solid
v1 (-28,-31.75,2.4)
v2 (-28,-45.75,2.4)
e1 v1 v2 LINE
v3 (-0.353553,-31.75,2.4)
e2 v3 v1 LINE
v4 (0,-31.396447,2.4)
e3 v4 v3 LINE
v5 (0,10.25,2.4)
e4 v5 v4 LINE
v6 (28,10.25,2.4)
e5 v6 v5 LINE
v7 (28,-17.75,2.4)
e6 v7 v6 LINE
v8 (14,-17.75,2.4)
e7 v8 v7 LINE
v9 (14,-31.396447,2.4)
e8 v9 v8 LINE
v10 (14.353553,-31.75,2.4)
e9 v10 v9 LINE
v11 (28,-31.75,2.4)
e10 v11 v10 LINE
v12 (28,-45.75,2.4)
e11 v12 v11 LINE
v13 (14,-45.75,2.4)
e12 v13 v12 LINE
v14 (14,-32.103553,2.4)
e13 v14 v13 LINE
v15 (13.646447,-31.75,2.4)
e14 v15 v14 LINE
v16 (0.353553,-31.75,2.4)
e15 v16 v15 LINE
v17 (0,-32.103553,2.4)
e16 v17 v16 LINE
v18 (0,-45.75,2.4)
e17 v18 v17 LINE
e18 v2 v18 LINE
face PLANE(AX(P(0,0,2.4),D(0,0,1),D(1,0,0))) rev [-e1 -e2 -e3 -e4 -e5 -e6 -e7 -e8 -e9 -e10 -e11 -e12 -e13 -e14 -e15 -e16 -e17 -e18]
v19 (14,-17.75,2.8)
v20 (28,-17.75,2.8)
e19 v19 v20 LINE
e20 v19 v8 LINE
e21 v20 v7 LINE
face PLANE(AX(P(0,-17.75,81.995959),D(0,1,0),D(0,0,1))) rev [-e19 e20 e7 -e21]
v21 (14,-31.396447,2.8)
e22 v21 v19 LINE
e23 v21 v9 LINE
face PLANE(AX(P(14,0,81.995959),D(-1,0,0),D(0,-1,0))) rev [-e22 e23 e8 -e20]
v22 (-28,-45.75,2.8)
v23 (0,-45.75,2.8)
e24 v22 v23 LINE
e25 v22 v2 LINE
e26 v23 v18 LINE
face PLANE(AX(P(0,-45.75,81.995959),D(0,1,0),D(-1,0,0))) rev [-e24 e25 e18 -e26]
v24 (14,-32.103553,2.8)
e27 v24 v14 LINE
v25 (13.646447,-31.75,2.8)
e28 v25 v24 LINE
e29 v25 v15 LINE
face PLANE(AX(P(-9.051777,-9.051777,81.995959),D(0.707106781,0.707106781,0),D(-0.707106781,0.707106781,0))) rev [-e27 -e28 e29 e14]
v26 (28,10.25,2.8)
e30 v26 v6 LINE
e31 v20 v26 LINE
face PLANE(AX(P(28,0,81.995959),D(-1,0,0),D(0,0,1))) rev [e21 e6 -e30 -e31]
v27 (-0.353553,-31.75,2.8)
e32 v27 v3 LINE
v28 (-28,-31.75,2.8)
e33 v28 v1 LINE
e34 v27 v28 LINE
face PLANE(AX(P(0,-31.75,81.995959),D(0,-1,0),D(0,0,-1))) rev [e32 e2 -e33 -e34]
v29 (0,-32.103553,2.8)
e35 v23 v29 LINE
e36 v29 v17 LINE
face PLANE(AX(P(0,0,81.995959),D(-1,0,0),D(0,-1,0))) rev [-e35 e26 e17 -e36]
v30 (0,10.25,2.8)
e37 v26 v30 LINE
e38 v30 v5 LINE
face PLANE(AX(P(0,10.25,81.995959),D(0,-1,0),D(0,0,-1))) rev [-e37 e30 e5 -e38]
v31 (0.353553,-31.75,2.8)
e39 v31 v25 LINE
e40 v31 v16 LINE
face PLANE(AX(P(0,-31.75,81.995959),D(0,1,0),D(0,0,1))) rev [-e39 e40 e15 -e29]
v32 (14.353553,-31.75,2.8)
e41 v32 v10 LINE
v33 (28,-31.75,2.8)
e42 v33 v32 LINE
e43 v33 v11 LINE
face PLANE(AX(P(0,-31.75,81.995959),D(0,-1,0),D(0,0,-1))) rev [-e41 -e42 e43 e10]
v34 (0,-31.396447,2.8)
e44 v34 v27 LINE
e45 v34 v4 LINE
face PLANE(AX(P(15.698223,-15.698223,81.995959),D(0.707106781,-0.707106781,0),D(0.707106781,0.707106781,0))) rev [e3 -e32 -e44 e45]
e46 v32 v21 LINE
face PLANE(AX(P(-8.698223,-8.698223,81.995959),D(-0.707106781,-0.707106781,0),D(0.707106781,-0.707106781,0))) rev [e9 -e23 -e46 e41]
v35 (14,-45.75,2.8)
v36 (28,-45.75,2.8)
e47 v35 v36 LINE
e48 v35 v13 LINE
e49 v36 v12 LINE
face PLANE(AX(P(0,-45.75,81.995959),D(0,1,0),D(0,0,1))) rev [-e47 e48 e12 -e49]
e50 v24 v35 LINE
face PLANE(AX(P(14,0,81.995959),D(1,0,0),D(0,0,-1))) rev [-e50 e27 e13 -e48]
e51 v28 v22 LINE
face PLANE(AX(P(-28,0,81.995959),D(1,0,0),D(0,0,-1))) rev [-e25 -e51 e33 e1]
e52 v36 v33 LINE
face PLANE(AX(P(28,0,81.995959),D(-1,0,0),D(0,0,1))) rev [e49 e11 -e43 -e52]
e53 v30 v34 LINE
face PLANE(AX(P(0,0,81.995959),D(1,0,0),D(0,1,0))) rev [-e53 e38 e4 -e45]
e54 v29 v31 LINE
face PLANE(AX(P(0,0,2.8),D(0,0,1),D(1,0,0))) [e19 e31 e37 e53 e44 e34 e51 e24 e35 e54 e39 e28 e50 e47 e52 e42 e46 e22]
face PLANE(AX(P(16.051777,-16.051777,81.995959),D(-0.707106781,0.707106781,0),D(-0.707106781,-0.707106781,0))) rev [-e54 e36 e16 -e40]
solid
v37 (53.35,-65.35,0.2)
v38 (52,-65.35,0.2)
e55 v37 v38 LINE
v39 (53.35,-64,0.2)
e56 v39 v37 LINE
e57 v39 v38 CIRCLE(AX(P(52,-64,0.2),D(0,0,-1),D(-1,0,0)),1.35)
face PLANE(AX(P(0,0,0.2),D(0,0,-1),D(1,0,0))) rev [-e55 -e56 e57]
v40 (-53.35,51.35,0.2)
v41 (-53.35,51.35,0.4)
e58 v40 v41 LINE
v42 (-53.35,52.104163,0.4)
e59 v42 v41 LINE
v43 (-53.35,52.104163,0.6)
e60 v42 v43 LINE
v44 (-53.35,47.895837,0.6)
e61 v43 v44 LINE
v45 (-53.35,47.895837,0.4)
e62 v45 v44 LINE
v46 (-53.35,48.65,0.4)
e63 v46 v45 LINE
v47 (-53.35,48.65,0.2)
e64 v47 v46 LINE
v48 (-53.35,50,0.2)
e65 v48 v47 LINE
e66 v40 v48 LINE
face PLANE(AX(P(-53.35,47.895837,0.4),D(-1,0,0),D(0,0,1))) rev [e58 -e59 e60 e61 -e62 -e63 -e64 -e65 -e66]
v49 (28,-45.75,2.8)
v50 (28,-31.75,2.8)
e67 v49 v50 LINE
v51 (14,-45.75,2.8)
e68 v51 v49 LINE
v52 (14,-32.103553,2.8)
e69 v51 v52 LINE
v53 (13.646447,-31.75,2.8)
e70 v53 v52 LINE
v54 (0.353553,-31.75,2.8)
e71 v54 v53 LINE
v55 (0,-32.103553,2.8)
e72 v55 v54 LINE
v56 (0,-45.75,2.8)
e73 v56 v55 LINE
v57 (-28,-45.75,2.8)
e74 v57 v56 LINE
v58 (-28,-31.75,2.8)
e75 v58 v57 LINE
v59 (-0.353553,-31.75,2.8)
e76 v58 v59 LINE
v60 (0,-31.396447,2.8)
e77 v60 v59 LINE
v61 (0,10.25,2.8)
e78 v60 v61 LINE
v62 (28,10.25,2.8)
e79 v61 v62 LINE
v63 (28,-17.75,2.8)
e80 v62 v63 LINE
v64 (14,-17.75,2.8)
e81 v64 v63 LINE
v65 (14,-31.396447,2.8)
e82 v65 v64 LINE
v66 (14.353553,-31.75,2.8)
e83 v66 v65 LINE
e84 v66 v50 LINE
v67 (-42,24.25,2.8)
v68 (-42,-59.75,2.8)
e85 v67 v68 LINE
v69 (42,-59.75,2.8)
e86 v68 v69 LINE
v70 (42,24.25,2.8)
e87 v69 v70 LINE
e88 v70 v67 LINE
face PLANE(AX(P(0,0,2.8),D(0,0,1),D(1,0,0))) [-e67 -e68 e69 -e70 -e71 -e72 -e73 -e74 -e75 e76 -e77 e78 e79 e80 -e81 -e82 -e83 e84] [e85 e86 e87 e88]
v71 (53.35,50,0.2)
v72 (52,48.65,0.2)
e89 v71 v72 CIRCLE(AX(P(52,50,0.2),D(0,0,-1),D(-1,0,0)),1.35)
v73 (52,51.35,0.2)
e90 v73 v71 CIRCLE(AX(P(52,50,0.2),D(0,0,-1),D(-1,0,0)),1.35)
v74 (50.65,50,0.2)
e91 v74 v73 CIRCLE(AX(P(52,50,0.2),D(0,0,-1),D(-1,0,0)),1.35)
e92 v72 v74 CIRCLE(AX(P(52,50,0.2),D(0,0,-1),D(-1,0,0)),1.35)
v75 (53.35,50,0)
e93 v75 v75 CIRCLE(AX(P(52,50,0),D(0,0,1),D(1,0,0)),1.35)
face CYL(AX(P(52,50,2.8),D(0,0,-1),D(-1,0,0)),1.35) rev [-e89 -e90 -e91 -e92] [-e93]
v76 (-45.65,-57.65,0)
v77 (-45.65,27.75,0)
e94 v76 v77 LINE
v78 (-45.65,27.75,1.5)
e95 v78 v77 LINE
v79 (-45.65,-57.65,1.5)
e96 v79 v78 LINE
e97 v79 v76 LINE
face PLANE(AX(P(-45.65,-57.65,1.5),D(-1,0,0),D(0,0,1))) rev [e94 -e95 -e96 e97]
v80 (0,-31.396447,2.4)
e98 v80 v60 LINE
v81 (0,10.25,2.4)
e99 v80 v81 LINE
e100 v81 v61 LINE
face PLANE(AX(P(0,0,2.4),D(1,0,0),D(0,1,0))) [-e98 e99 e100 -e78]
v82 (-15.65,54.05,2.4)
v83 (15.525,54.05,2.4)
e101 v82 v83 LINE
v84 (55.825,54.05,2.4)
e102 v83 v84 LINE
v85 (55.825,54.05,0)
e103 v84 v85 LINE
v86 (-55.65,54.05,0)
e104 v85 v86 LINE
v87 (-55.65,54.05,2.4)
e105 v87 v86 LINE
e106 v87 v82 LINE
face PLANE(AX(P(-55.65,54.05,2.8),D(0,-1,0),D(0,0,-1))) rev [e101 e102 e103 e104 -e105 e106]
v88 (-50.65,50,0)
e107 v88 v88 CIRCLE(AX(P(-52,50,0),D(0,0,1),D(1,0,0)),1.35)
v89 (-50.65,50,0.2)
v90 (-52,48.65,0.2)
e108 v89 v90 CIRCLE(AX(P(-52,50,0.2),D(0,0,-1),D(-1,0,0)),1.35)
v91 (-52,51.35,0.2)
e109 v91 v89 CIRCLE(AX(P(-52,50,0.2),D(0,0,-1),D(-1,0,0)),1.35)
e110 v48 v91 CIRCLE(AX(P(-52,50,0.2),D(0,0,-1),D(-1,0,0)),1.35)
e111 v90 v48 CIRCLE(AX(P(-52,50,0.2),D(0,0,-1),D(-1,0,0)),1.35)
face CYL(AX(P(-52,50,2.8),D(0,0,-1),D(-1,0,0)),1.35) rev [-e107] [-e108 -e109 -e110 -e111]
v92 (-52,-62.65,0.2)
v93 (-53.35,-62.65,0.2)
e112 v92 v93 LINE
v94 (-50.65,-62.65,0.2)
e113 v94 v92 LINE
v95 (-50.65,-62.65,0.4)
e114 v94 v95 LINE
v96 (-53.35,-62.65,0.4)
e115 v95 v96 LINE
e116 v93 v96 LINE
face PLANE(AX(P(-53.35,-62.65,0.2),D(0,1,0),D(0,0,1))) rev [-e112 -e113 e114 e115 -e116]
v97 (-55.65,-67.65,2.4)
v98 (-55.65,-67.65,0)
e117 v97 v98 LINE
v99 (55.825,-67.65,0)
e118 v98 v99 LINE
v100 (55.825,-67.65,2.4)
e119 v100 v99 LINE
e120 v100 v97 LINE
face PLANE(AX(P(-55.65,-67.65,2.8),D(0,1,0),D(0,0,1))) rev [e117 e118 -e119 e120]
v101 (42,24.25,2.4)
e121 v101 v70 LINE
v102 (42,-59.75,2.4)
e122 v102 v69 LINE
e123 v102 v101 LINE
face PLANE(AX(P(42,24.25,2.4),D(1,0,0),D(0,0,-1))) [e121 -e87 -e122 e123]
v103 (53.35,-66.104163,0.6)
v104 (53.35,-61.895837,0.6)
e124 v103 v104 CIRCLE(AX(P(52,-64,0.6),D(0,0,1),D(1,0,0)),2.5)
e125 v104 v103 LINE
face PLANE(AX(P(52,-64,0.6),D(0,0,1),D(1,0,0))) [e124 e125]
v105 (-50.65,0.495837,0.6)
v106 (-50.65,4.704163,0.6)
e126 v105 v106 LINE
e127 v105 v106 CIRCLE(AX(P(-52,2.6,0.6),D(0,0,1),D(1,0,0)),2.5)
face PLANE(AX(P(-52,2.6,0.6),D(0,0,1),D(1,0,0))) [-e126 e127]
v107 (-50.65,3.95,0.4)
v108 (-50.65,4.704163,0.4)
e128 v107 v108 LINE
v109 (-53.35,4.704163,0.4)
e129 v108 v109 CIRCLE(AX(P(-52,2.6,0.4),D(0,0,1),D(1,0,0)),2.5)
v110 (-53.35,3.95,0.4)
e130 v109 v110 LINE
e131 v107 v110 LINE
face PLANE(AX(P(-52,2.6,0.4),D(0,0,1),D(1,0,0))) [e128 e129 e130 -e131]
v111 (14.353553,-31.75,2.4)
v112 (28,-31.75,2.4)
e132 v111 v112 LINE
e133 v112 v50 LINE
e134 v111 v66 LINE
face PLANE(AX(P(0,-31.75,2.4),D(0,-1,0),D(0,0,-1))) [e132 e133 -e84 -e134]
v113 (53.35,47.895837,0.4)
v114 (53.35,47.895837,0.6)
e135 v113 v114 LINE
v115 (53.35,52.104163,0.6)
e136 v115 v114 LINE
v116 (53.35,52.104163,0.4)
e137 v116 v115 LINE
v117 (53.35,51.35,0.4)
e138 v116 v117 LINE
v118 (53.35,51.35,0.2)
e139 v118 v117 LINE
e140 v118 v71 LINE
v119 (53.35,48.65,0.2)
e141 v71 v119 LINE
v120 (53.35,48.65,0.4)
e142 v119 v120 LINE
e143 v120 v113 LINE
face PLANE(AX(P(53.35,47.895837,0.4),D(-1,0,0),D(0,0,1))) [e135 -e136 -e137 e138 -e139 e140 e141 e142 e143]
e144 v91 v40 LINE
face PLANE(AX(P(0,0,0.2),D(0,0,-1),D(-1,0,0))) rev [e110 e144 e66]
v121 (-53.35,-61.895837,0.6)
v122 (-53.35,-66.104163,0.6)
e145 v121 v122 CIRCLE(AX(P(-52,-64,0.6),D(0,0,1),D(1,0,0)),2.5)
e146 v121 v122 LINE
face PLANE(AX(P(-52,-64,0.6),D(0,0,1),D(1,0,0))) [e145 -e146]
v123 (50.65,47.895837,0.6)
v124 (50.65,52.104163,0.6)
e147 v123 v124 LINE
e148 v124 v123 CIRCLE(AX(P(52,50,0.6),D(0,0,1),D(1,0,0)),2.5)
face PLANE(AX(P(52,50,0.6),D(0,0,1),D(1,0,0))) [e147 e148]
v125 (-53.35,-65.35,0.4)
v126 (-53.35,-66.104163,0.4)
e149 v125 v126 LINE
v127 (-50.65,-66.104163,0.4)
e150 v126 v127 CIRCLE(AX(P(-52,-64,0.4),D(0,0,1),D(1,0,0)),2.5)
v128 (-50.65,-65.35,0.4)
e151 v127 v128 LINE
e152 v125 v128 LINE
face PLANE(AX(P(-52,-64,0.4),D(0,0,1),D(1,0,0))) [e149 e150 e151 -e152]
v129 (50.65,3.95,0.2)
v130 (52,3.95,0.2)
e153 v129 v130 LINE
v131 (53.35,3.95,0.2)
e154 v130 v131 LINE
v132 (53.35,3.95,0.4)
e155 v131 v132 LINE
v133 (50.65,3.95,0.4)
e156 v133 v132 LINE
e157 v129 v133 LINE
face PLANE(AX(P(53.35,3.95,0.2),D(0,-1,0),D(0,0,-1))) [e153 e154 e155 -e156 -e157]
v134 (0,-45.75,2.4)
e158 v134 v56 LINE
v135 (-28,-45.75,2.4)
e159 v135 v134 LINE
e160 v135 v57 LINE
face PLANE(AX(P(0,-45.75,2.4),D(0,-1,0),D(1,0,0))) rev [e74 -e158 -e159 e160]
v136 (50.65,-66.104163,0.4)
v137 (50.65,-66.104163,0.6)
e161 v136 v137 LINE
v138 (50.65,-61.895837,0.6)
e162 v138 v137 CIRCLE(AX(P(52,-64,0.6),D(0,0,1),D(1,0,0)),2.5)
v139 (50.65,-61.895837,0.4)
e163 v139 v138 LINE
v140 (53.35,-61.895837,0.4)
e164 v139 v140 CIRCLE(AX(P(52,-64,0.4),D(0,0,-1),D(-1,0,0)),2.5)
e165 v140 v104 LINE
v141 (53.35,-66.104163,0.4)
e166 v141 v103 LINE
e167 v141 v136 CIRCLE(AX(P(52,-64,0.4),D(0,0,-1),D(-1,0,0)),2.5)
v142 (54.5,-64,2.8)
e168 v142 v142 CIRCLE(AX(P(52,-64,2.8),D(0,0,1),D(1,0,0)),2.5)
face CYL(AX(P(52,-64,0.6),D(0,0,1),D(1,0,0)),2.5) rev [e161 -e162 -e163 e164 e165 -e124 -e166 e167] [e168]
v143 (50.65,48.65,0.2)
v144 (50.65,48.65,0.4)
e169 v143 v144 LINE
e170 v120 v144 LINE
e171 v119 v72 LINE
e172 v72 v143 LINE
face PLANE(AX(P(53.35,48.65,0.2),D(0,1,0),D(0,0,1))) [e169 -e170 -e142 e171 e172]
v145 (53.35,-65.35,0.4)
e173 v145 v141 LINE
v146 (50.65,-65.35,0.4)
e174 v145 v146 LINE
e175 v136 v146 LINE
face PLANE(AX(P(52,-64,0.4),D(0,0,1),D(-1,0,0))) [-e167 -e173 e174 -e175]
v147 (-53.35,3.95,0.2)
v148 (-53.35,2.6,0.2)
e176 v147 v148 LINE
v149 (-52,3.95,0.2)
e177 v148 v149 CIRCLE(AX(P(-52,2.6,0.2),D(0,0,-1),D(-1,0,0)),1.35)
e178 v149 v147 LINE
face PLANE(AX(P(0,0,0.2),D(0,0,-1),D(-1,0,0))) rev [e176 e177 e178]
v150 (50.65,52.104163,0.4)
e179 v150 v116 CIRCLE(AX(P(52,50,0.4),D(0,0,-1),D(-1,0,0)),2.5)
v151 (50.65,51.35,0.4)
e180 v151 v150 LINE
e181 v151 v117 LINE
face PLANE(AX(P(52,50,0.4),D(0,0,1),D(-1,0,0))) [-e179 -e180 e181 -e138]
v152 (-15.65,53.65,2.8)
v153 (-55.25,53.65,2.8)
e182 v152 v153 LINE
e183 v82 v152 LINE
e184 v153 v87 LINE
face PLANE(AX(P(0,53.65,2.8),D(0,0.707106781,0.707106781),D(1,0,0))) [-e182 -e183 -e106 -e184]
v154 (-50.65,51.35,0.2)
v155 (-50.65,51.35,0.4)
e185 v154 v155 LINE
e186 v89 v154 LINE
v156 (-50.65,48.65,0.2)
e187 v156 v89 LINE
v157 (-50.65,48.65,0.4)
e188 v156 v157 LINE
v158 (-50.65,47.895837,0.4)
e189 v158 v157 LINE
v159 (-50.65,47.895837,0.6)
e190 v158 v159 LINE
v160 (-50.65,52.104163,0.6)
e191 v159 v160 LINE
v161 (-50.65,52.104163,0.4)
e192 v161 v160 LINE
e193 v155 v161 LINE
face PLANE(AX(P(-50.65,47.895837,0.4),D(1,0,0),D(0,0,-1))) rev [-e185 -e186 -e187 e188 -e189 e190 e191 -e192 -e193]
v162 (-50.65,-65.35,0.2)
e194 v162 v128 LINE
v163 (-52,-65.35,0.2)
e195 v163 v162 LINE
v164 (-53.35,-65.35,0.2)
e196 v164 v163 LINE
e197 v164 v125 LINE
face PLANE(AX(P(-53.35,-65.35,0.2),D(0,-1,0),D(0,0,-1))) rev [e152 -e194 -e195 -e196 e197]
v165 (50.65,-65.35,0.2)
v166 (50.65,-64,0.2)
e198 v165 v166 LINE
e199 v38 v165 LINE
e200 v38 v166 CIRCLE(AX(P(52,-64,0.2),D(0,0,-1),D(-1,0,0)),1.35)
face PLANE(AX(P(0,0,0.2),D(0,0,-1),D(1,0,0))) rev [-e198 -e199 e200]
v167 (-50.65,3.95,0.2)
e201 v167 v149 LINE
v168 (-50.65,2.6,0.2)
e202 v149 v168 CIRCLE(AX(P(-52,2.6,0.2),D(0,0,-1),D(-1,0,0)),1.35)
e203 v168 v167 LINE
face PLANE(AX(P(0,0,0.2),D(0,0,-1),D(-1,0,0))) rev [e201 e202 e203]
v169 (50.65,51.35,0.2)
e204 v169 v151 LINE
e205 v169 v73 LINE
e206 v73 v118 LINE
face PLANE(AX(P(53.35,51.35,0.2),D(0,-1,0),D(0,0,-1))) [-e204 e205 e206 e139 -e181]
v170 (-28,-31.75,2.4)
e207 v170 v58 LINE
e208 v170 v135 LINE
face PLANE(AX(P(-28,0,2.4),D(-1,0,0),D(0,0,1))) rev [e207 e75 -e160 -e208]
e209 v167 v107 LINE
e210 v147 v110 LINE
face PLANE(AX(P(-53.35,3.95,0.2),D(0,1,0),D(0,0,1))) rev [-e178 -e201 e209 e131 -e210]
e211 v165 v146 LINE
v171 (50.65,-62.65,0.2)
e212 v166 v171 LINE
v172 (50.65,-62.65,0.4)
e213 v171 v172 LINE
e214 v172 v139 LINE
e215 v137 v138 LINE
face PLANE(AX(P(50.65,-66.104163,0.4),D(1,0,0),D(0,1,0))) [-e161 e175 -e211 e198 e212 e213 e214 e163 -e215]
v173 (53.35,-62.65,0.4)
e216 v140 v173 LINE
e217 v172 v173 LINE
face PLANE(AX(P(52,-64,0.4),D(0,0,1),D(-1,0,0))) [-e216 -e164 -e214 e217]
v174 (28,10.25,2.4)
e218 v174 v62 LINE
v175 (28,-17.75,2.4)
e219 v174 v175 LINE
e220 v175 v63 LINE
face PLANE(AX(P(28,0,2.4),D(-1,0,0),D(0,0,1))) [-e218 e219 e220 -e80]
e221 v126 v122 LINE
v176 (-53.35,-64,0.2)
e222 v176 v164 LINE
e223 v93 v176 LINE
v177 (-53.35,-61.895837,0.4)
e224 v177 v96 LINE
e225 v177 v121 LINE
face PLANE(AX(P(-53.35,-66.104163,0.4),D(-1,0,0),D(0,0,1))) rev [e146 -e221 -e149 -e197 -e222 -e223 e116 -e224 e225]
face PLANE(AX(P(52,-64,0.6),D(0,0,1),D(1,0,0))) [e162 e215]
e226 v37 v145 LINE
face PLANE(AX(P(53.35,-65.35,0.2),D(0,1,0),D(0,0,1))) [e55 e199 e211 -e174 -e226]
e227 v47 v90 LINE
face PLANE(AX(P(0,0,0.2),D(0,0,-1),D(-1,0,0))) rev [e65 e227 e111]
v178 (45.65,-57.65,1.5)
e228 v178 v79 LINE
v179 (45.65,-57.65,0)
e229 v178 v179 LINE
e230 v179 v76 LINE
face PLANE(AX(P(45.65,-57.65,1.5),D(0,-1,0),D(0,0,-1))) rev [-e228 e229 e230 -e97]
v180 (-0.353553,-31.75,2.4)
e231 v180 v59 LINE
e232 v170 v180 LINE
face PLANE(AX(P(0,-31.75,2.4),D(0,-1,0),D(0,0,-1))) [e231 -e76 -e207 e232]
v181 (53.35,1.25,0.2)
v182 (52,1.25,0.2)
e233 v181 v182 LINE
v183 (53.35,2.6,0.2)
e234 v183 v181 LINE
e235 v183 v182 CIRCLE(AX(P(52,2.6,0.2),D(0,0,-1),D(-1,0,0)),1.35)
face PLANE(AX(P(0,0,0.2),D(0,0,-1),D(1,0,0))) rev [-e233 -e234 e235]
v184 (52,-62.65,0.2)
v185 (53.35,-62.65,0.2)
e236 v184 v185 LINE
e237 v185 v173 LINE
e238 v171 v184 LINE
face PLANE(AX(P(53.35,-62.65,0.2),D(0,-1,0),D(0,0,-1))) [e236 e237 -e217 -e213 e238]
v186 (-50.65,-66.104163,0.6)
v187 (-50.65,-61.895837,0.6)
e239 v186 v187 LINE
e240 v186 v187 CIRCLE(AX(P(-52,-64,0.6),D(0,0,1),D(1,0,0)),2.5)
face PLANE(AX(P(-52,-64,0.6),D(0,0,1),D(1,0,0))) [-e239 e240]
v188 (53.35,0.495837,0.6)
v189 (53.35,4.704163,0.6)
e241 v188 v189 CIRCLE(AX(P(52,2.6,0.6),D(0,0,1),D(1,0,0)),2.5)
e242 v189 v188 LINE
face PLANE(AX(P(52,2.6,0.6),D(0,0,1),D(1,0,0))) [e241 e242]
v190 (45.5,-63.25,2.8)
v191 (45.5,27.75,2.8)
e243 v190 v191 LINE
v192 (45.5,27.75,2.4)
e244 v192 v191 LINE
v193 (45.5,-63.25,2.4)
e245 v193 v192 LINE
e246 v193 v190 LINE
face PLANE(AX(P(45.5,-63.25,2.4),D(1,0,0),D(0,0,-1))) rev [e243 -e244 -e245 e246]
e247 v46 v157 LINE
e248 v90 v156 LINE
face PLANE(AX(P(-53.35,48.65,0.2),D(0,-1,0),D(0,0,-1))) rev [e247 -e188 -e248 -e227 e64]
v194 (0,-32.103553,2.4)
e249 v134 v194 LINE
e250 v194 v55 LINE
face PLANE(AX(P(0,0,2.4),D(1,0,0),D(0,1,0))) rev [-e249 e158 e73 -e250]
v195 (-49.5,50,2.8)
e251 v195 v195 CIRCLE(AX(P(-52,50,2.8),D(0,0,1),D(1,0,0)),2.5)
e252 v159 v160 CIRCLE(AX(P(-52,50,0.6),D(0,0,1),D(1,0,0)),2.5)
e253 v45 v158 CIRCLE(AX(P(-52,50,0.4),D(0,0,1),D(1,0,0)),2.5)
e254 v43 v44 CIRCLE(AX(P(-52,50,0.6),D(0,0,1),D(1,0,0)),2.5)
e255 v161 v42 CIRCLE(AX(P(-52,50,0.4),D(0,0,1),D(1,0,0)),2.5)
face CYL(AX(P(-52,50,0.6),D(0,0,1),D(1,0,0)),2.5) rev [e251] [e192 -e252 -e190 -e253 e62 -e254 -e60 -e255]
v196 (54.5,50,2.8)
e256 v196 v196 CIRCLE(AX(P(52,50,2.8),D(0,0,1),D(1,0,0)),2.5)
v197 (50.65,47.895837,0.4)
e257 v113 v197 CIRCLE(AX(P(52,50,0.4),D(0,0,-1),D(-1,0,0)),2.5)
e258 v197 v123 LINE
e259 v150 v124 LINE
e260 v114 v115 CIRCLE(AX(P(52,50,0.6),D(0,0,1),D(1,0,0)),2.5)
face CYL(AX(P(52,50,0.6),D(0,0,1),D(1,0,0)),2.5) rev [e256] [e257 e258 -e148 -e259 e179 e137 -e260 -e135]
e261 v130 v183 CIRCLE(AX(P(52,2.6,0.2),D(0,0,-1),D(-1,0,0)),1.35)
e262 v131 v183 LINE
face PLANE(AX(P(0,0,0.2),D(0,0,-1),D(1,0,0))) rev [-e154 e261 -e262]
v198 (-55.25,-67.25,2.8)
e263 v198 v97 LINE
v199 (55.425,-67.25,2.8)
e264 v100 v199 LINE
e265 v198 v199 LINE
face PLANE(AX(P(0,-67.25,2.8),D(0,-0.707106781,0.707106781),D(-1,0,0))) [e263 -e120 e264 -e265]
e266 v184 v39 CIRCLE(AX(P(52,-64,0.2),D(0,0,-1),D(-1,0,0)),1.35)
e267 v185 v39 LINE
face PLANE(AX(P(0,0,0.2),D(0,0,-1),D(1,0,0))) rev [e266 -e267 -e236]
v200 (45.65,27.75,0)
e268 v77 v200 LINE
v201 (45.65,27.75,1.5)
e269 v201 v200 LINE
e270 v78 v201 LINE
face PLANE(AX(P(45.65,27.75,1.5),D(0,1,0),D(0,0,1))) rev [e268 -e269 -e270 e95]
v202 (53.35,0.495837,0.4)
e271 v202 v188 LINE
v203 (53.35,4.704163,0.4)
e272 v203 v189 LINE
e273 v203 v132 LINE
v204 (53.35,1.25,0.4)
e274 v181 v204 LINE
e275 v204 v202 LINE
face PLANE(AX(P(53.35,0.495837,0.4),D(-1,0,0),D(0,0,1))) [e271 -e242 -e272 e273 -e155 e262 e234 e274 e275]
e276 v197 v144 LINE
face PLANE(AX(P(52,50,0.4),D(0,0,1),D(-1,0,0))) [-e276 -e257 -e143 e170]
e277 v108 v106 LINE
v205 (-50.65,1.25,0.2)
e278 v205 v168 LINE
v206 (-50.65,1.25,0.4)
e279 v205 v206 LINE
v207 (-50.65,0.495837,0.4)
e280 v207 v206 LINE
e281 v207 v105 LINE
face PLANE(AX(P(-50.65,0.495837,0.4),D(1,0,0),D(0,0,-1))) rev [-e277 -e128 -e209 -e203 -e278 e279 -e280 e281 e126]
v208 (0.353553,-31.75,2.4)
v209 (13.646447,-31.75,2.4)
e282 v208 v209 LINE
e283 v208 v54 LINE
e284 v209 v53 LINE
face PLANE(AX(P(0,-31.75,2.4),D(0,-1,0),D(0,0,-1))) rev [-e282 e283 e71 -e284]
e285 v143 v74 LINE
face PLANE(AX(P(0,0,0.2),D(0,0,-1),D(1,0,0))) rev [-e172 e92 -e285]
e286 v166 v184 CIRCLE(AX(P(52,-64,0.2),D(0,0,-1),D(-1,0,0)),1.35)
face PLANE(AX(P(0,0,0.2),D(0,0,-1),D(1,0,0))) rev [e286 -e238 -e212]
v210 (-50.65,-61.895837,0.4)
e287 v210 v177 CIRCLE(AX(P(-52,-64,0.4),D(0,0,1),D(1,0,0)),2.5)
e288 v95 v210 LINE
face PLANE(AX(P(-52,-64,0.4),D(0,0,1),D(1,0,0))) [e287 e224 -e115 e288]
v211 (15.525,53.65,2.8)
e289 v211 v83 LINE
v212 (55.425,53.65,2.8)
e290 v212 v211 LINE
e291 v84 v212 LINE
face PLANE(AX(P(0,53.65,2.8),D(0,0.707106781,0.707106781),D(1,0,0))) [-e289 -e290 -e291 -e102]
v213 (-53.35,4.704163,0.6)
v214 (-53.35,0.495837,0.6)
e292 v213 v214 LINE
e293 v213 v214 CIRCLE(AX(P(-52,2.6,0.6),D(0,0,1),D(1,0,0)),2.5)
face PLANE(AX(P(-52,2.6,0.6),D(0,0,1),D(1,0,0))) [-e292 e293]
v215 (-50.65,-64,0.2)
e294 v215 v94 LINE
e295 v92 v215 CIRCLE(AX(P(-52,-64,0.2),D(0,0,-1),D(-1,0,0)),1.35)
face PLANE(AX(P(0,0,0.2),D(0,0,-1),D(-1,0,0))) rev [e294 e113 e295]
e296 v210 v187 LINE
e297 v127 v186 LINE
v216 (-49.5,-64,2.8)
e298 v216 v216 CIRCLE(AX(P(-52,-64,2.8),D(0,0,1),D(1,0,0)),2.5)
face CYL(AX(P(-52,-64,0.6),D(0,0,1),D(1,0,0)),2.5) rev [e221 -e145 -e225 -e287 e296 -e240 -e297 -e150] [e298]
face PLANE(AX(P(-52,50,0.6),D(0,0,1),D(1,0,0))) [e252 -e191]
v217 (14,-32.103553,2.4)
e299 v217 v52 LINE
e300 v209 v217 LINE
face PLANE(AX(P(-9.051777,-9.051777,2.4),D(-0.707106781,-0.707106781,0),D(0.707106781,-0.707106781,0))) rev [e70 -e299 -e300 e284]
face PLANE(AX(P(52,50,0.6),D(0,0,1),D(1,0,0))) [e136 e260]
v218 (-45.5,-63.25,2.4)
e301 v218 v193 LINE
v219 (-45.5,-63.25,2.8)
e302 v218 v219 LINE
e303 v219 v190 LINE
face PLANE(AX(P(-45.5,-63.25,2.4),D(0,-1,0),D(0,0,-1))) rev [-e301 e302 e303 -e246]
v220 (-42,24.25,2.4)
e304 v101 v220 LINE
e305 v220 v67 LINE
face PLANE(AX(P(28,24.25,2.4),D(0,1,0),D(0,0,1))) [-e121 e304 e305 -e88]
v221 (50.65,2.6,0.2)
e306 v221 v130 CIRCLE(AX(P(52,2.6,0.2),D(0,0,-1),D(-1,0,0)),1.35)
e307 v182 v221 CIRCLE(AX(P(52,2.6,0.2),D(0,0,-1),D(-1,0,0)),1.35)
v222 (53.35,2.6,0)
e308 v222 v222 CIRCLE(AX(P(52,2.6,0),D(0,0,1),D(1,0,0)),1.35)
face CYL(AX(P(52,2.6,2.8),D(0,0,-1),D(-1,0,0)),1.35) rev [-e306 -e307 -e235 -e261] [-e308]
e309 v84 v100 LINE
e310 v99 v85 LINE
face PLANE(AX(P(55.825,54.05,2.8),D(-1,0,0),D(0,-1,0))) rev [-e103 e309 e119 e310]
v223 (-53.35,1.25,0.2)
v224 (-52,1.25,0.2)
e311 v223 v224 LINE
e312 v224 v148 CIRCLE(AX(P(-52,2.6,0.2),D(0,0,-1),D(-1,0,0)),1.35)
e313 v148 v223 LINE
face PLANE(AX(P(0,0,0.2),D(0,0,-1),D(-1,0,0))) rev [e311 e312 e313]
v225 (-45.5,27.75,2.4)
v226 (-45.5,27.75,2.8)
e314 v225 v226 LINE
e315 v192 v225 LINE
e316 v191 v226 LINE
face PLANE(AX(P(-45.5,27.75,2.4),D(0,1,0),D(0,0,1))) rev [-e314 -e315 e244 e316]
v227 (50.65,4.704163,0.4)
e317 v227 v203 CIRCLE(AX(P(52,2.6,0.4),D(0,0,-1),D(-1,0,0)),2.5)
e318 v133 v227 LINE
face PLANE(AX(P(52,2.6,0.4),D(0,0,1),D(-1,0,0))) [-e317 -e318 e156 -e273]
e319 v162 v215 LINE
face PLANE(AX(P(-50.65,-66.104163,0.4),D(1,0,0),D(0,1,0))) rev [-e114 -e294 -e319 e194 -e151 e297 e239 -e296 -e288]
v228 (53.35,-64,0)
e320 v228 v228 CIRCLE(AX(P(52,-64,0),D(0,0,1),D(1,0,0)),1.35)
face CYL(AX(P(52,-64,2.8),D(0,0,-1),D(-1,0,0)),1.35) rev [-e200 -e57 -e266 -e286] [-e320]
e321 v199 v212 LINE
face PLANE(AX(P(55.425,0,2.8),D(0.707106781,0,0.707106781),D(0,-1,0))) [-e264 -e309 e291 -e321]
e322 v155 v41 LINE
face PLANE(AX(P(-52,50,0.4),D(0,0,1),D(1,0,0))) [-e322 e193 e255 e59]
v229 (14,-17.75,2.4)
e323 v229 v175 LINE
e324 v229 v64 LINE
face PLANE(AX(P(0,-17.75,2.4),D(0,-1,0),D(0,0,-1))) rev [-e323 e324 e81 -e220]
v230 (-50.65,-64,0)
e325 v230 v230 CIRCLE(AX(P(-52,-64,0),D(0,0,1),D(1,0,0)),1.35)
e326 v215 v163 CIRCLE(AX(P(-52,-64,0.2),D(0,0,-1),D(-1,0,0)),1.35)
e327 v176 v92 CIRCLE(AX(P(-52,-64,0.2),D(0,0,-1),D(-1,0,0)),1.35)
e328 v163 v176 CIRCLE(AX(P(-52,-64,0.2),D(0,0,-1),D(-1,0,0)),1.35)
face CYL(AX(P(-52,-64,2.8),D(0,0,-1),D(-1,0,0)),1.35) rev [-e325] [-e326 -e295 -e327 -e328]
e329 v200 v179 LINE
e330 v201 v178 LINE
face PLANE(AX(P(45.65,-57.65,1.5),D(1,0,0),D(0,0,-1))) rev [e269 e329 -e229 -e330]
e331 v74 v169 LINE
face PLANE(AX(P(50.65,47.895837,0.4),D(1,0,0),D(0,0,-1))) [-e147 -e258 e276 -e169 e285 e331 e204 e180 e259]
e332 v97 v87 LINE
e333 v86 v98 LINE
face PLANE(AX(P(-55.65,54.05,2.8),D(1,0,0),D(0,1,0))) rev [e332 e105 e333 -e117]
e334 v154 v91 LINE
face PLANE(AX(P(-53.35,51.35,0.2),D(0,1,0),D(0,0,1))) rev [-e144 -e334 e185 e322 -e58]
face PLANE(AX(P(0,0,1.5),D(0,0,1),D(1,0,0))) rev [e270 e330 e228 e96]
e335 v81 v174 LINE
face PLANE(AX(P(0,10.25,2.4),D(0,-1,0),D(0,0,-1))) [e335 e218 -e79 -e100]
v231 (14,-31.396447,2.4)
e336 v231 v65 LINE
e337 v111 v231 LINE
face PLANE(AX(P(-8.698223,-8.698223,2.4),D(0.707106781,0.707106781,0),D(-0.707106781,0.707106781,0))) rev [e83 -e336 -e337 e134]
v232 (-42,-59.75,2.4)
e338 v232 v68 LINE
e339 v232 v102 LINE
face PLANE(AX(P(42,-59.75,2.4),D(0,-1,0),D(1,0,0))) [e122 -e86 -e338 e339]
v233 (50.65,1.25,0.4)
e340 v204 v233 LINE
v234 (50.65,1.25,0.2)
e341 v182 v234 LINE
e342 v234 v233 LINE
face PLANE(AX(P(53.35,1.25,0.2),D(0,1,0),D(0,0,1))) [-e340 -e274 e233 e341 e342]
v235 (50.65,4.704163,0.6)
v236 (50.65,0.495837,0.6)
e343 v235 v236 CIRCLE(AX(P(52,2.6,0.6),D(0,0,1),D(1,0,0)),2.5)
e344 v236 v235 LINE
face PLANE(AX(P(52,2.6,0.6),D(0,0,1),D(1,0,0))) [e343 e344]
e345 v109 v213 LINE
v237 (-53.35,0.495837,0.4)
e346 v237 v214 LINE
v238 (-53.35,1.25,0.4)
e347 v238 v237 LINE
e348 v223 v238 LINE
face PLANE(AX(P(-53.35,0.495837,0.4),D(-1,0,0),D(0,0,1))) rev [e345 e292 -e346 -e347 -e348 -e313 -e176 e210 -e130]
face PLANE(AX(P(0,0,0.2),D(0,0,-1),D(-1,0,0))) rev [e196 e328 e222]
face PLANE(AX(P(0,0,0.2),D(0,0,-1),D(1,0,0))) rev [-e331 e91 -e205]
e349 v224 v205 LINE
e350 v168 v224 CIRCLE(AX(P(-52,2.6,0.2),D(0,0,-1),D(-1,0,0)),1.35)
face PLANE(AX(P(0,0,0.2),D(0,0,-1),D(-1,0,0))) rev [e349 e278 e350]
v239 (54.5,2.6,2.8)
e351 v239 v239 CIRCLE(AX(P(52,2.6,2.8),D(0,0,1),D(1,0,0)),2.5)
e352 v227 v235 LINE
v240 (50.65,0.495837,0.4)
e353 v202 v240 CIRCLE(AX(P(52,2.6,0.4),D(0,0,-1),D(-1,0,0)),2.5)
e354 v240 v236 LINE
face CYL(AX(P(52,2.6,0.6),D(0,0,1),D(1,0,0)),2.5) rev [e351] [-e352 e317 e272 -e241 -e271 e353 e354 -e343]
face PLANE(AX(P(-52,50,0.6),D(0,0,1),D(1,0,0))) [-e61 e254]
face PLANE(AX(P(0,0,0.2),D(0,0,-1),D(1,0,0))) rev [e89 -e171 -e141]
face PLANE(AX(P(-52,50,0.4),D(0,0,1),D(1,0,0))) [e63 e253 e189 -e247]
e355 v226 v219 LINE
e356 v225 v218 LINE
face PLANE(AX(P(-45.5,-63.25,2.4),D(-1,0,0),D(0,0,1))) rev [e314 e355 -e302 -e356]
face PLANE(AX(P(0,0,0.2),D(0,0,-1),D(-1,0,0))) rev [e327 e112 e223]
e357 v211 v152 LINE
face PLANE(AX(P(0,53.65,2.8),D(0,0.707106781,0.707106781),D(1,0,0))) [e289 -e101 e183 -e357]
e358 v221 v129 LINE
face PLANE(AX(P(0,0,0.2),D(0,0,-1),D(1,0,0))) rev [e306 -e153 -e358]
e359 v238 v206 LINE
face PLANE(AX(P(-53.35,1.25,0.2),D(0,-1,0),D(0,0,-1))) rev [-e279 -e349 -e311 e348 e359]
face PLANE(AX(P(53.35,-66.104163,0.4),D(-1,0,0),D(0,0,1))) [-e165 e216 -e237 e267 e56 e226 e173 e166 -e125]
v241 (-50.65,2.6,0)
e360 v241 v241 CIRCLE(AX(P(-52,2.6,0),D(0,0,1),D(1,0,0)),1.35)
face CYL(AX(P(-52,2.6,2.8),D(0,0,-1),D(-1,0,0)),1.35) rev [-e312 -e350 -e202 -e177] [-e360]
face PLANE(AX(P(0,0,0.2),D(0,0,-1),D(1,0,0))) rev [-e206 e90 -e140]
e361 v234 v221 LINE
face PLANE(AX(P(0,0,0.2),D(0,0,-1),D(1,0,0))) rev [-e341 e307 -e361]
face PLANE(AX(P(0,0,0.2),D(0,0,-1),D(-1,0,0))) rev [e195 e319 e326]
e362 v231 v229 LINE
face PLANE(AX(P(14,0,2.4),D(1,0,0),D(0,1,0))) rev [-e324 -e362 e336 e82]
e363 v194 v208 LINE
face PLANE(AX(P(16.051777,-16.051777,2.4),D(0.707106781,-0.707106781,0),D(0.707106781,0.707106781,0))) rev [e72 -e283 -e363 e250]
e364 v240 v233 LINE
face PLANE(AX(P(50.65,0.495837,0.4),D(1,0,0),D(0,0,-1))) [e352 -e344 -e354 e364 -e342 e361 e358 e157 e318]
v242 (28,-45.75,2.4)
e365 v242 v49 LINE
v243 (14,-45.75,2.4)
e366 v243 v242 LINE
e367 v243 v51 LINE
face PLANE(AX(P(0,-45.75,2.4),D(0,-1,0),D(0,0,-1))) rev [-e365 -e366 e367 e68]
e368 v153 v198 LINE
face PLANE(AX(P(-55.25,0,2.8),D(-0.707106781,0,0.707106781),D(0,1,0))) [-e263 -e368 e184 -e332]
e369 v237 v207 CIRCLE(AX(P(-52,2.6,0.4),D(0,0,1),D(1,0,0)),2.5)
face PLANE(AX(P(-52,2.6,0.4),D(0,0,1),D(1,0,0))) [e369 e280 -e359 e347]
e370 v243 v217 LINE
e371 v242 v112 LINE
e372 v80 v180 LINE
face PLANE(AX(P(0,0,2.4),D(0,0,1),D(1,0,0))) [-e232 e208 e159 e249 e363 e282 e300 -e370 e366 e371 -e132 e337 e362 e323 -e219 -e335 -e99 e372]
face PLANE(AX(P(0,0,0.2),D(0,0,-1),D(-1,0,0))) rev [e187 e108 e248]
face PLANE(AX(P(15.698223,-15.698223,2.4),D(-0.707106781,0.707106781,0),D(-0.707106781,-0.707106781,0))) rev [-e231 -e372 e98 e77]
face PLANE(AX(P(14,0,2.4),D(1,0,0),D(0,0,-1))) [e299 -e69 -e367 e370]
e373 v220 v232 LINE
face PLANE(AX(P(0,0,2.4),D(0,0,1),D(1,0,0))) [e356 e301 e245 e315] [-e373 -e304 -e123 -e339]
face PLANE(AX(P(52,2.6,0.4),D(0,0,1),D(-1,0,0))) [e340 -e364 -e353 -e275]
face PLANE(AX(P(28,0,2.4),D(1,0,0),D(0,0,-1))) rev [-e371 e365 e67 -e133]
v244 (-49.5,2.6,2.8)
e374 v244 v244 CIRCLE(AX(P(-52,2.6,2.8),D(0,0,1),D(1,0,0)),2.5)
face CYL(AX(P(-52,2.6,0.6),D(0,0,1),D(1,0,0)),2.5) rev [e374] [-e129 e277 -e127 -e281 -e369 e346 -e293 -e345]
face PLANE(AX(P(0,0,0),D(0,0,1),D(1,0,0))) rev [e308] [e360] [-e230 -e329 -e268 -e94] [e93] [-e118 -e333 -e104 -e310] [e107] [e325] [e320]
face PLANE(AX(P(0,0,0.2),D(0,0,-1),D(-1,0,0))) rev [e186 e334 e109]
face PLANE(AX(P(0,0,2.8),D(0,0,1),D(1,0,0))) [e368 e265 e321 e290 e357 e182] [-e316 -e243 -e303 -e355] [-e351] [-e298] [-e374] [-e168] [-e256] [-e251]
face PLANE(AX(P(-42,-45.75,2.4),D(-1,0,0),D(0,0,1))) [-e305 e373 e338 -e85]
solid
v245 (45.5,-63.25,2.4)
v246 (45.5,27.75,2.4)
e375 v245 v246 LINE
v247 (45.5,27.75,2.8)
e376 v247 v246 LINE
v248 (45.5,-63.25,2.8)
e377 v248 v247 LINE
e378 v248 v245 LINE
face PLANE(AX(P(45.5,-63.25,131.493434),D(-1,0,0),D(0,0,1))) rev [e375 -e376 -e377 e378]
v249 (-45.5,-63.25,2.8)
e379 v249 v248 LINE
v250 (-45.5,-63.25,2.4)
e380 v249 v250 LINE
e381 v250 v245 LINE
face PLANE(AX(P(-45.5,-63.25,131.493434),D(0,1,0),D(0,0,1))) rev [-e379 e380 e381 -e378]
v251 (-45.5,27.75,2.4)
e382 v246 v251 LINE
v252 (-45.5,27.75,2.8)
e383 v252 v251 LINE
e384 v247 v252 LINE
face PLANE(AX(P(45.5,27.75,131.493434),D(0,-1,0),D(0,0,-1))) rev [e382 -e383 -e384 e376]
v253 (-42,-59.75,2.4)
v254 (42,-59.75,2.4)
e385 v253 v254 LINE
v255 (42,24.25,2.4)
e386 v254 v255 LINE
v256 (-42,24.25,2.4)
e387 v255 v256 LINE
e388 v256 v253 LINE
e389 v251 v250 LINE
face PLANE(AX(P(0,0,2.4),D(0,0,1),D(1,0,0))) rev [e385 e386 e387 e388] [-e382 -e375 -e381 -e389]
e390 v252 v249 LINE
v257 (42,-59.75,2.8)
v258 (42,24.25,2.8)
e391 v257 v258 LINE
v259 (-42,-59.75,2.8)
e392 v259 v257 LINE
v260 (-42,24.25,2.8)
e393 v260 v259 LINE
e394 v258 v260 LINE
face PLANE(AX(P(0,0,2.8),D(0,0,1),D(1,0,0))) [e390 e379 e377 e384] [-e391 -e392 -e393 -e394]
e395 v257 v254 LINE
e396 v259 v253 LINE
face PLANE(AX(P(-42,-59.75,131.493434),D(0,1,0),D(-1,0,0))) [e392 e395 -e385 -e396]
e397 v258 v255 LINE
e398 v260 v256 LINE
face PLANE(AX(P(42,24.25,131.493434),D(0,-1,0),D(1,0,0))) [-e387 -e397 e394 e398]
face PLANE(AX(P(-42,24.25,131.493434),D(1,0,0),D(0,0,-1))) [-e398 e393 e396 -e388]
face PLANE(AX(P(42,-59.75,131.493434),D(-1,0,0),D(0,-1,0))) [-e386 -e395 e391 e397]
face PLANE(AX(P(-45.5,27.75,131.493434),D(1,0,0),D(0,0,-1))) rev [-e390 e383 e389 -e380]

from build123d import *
from build123d.topology import SkipClean

# Parameters (mm, degrees)
SKETCH1_R           = 1.35
BOSS_EXTRUDE1_DEPTH = 2.8
SKETCH3_R           = 2.5
CUT_EXTRUDE1_DEPTH  = 2.2
SKETCH4_W           = 91.3
SKETCH4_H           = 85.4
CUT_EXTRUDE2_DEPTH  = 1.5
CUT_EXTRUDE3_DEPTH  = 0.2
SKETCH6_W           = 2.7
SKETCH6_H           = 2.7
CUT_EXTRUDE4_DEPTH  = 0.2
CHAMFER1_SIZE       = 0.4
SKETCH7_W           = 91
SKETCH7_H           = 91
CUT_EXTRUDE5_DEPTH  = 0.4
SKETCH8_W           = 91
SKETCH8_H           = 91
SKETCH8_W_2         = 84
SKETCH8_H_2         = 84
BOSS_EXTRUDE2_DEPTH = 0.4
CUT_EXTRUDE6_DEPTH  = 0.4
BOSS_EXTRUDE3_DEPTH = 0.4
BOSS_EXTRUDE4_START = -2.8
SKETCH11_W          = 31.175
SKETCH11_H          = 25.7
BOSS_EXTRUDE4_DEPTH = 2.8
CHAMFER2_SIZE       = 0.4


with BuildPart() as part:
    # Sketch1 → Boss-Extrude1 (new body)
    with BuildSketch(Plane.XY):
        Polygon((-15.25, 54.05), (-15.25, 28.75), (15.125, 28.75), (15.125, 54.05), (55.825, 54.05), (55.825, -67.65), (-55.65, -67.65), (-55.65, 54.05), align=None)
        with Locations((-52, 50)):
            Circle(SKETCH1_R, mode=Mode.SUBTRACT)
        with Locations((-52, 2.6)):
            Circle(SKETCH1_R, mode=Mode.SUBTRACT)
        with Locations((-52, -64)):
            Circle(SKETCH1_R, mode=Mode.SUBTRACT)
        with Locations((52, 50)):
            Circle(SKETCH1_R, mode=Mode.SUBTRACT)
        with Locations((52, 2.6)):
            Circle(SKETCH1_R, mode=Mode.SUBTRACT)
        with Locations((52, -64)):
            Circle(SKETCH1_R, mode=Mode.SUBTRACT)
    extrude(amount=BOSS_EXTRUDE1_DEPTH)

    # Sketch3 → Cut-Extrude1 (cut)
    with BuildSketch(Plane.XY.offset(2.8)):
        with Locations((-52, 50)):
            Circle(SKETCH3_R)
        with Locations((-52, 2.6)):
            Circle(SKETCH3_R)
        with Locations((-52, -64)):
            Circle(SKETCH3_R)
        with Locations((52, -64)):
            Circle(SKETCH3_R)
        with Locations((52, 2.6)):
            Circle(SKETCH3_R)
        with Locations((52, 50)):
            Circle(SKETCH3_R)
    extrude(amount=-CUT_EXTRUDE1_DEPTH, mode=Mode.SUBTRACT)

    # Sketch4 → Cut-Extrude2 (cut)
    with BuildSketch(Plane(origin=(0, 0, 0), x_dir=(-1, 0, 0), z_dir=(0, 0, -1))):
        with Locations((0, -14.95)):
            Rectangle(SKETCH4_W, SKETCH4_H)
    extrude(amount=-CUT_EXTRUDE2_DEPTH, mode=Mode.SUBTRACT)

    # Sketch5 → Cut-Extrude3 (cut)
    with SkipClean():  # the faces are left unmerged after this step: merging them gives an invalid solid
        with BuildSketch(Plane.XY.offset(0.6)):
            with BuildLine():
                Line((-53.35, 47.895837459), (-53.35, 52.104162541))
                ThreePointArc((-53.35, 52.104162541), (-52, 52.5), (-50.65, 52.104162541))
                Line((-50.65, 52.104162541), (-50.65, 47.895837459))
                ThreePointArc((-50.65, 47.895837459), (-52, 47.5), (-53.35, 47.895837459))
            make_face()
            with BuildLine():
                Line((-53.35, 0.495837459), (-53.35, 4.704162541))
                ThreePointArc((-53.35, 4.704162541), (-52, 5.1), (-50.65, 4.704162541))
                Line((-50.65, 4.704162541), (-50.65, 0.495837459))
                ThreePointArc((-50.65, 0.495837459), (-52, 0.1), (-53.35, 0.495837459))
            make_face()
            with BuildLine():
                Line((-53.35, -66.104162541), (-53.35, -61.895837459))
                ThreePointArc((-53.35, -61.895837459), (-52, -61.5), (-50.65, -61.895837459))
                Line((-50.65, -61.895837459), (-50.65, -66.104162541))
                ThreePointArc((-50.65, -66.104162541), (-52, -66.5), (-53.35, -66.104162541))
            make_face()
        cut_extrude3 = extrude(amount=-CUT_EXTRUDE3_DEPTH, mode=Mode.SUBTRACT)

    # Sketch6 → Cut-Extrude4 (cut)
    with SkipClean():  # the faces are left unmerged after this step: merging them gives an invalid solid
        with BuildSketch(Plane.XY.offset(0.4)):
            with Locations((-52, -64)):
                Rectangle(SKETCH6_W, SKETCH6_H)
            with Locations((-52, 2.6)):
                Rectangle(SKETCH6_W, SKETCH6_H)
            with Locations((-52, 50)):
                Rectangle(SKETCH6_W, SKETCH6_H)
        cut_extrude4 = extrude(amount=-CUT_EXTRUDE4_DEPTH, mode=Mode.SUBTRACT)

    # Mirror1: Cut-Extrude3, Cut-Extrude4 across plane
    with SkipClean():  # the faces are left unmerged after this step: merging them gives an invalid solid
        add(cut_extrude3.mirror(Plane(origin=(0, 0, 0), x_dir=(0, 0, 1), z_dir=(1, 0, 0))), mode=Mode.SUBTRACT)
        add(cut_extrude4.mirror(Plane(origin=(0, 0, 0), x_dir=(0, 0, 1), z_dir=(1, 0, 0))), mode=Mode.SUBTRACT)

    # Chamfer1
    chamfer1_edges = [part.edges().sort_by_distance(p)[0] for p in [
        (55.825, -6.8, 2.8),
        (35.475, 54.05, 2.8),
        (15.125, 41.4, 2.8),
        (-0.0625, 28.75, 2.8),
        (-15.25, 41.4, 2.8),
        (-35.45, 54.05, 2.8),
        (-55.65, -6.8, 2.8),
        (0.0875, -67.65, 2.8),
    ]]
    chamfer(chamfer1_edges, length=CHAMFER1_SIZE)

    # Sketch7 → Cut-Extrude5 (cut)
    with SkipClean():  # the faces are left unmerged after this step: merging them gives an invalid solid
        with BuildSketch(Plane.XY.offset(2.8)):
            with Locations((0, -17.75)):
                Rectangle(SKETCH7_W, SKETCH7_H)
            Polygon((28, 24.25), (42, 24.25), (42, 10.25), (42, -3.75), (42, -17.75), (42, -31.75), (42, -45.75), (42, -59.75), (28, -59.75), (14, -59.75), (0, -59.75), (-14, -59.75), (-28, -59.75), (-42, -59.75), (-42, -45.75), (-42, -31.75), (-42, -17.75), (-42, -3.75), (-42, 10.25), (-42, 24.25), (-28, 24.25), (-14, 24.25), (0, 24.25), (14, 24.25), align=None, mode=Mode.SUBTRACT)
        extrude(amount=-CUT_EXTRUDE5_DEPTH, mode=Mode.SUBTRACT)

    # Sketch9 → Cut-Extrude6 (cut)
    with SkipClean():  # the faces are left unmerged after this step: merging them gives an invalid solid
        with BuildSketch(Plane.XY.offset(2.8)):
            Polygon((-28, -31.75), (-28, -45.75), (-14, -45.75), (0, -45.75), (0, -32.103553391), (0.353553391, -31.75), (13.646446609, -31.75), (14, -32.103553391), (14, -45.75), (28, -45.75), (28, -31.75), (14.353553391, -31.75), (14, -31.396446609), (14, -17.75), (28, -17.75), (28, -3.75), (28, 10.25), (14, 10.25), (0, 10.25), (0, -3.75), (0, -17.75), (0, -31.396446609), (-0.353553391, -31.75), (-14, -31.75), align=None)
        extrude(amount=-CUT_EXTRUDE6_DEPTH, mode=Mode.SUBTRACT)

    # Sketch11 → Boss-Extrude4 (add)
    with SkipClean():  # the faces are left unmerged after this step: merging them gives an invalid solid
        with BuildSketch(Plane.XY.offset(2.8).offset(BOSS_EXTRUDE4_START)):
            with Locations((-0.0625, 41.2)):
                Rectangle(SKETCH11_W, SKETCH11_H)
        extrude(amount=BOSS_EXTRUDE4_DEPTH)

    # Chamfer2
    chamfer2_edges = [part.edges().sort_by_distance(p)[0] for p in [
        (-0.0625, 54.05, 2.8),
    ]]
    chamfer(chamfer2_edges, length=CHAMFER2_SIZE - 0.0001)  # a hair under: the kernel refuses the full size


with BuildPart() as body_2:
    # Sketch8 → Boss-Extrude2 (new body)
    with BuildSketch(Plane.XY.offset(2.4)):
        with Locations((0, -17.75)):
            Rectangle(SKETCH8_W, SKETCH8_H)
        with Locations((0, -17.75)):
            Rectangle(SKETCH8_W_2, SKETCH8_H_2, mode=Mode.SUBTRACT)
    extrude(amount=BOSS_EXTRUDE2_DEPTH)


with BuildPart() as body_3:
    # Sketch10 → Boss-Extrude3 (new body)
    with BuildSketch(Plane.XY.offset(2.4)):
        Polygon((28, -31.75), (14.353553391, -31.75), (14, -31.396446609), (14, -17.75), (28, -17.75), (28, 10.25), (0, 10.25), (0, -31.396446609), (-0.353553391, -31.75), (-28, -31.75), (-28, -45.75), (0, -45.75), (0, -32.103553391), (0.353553391, -31.75), (13.646446609, -31.75), (14, -32.103553391), (14, -45.75), (28, -45.75), align=None)
    extrude(amount=BOSS_EXTRUDE3_DEPTH)


solid = Compound([part.part, body_2.part, body_3.part])
